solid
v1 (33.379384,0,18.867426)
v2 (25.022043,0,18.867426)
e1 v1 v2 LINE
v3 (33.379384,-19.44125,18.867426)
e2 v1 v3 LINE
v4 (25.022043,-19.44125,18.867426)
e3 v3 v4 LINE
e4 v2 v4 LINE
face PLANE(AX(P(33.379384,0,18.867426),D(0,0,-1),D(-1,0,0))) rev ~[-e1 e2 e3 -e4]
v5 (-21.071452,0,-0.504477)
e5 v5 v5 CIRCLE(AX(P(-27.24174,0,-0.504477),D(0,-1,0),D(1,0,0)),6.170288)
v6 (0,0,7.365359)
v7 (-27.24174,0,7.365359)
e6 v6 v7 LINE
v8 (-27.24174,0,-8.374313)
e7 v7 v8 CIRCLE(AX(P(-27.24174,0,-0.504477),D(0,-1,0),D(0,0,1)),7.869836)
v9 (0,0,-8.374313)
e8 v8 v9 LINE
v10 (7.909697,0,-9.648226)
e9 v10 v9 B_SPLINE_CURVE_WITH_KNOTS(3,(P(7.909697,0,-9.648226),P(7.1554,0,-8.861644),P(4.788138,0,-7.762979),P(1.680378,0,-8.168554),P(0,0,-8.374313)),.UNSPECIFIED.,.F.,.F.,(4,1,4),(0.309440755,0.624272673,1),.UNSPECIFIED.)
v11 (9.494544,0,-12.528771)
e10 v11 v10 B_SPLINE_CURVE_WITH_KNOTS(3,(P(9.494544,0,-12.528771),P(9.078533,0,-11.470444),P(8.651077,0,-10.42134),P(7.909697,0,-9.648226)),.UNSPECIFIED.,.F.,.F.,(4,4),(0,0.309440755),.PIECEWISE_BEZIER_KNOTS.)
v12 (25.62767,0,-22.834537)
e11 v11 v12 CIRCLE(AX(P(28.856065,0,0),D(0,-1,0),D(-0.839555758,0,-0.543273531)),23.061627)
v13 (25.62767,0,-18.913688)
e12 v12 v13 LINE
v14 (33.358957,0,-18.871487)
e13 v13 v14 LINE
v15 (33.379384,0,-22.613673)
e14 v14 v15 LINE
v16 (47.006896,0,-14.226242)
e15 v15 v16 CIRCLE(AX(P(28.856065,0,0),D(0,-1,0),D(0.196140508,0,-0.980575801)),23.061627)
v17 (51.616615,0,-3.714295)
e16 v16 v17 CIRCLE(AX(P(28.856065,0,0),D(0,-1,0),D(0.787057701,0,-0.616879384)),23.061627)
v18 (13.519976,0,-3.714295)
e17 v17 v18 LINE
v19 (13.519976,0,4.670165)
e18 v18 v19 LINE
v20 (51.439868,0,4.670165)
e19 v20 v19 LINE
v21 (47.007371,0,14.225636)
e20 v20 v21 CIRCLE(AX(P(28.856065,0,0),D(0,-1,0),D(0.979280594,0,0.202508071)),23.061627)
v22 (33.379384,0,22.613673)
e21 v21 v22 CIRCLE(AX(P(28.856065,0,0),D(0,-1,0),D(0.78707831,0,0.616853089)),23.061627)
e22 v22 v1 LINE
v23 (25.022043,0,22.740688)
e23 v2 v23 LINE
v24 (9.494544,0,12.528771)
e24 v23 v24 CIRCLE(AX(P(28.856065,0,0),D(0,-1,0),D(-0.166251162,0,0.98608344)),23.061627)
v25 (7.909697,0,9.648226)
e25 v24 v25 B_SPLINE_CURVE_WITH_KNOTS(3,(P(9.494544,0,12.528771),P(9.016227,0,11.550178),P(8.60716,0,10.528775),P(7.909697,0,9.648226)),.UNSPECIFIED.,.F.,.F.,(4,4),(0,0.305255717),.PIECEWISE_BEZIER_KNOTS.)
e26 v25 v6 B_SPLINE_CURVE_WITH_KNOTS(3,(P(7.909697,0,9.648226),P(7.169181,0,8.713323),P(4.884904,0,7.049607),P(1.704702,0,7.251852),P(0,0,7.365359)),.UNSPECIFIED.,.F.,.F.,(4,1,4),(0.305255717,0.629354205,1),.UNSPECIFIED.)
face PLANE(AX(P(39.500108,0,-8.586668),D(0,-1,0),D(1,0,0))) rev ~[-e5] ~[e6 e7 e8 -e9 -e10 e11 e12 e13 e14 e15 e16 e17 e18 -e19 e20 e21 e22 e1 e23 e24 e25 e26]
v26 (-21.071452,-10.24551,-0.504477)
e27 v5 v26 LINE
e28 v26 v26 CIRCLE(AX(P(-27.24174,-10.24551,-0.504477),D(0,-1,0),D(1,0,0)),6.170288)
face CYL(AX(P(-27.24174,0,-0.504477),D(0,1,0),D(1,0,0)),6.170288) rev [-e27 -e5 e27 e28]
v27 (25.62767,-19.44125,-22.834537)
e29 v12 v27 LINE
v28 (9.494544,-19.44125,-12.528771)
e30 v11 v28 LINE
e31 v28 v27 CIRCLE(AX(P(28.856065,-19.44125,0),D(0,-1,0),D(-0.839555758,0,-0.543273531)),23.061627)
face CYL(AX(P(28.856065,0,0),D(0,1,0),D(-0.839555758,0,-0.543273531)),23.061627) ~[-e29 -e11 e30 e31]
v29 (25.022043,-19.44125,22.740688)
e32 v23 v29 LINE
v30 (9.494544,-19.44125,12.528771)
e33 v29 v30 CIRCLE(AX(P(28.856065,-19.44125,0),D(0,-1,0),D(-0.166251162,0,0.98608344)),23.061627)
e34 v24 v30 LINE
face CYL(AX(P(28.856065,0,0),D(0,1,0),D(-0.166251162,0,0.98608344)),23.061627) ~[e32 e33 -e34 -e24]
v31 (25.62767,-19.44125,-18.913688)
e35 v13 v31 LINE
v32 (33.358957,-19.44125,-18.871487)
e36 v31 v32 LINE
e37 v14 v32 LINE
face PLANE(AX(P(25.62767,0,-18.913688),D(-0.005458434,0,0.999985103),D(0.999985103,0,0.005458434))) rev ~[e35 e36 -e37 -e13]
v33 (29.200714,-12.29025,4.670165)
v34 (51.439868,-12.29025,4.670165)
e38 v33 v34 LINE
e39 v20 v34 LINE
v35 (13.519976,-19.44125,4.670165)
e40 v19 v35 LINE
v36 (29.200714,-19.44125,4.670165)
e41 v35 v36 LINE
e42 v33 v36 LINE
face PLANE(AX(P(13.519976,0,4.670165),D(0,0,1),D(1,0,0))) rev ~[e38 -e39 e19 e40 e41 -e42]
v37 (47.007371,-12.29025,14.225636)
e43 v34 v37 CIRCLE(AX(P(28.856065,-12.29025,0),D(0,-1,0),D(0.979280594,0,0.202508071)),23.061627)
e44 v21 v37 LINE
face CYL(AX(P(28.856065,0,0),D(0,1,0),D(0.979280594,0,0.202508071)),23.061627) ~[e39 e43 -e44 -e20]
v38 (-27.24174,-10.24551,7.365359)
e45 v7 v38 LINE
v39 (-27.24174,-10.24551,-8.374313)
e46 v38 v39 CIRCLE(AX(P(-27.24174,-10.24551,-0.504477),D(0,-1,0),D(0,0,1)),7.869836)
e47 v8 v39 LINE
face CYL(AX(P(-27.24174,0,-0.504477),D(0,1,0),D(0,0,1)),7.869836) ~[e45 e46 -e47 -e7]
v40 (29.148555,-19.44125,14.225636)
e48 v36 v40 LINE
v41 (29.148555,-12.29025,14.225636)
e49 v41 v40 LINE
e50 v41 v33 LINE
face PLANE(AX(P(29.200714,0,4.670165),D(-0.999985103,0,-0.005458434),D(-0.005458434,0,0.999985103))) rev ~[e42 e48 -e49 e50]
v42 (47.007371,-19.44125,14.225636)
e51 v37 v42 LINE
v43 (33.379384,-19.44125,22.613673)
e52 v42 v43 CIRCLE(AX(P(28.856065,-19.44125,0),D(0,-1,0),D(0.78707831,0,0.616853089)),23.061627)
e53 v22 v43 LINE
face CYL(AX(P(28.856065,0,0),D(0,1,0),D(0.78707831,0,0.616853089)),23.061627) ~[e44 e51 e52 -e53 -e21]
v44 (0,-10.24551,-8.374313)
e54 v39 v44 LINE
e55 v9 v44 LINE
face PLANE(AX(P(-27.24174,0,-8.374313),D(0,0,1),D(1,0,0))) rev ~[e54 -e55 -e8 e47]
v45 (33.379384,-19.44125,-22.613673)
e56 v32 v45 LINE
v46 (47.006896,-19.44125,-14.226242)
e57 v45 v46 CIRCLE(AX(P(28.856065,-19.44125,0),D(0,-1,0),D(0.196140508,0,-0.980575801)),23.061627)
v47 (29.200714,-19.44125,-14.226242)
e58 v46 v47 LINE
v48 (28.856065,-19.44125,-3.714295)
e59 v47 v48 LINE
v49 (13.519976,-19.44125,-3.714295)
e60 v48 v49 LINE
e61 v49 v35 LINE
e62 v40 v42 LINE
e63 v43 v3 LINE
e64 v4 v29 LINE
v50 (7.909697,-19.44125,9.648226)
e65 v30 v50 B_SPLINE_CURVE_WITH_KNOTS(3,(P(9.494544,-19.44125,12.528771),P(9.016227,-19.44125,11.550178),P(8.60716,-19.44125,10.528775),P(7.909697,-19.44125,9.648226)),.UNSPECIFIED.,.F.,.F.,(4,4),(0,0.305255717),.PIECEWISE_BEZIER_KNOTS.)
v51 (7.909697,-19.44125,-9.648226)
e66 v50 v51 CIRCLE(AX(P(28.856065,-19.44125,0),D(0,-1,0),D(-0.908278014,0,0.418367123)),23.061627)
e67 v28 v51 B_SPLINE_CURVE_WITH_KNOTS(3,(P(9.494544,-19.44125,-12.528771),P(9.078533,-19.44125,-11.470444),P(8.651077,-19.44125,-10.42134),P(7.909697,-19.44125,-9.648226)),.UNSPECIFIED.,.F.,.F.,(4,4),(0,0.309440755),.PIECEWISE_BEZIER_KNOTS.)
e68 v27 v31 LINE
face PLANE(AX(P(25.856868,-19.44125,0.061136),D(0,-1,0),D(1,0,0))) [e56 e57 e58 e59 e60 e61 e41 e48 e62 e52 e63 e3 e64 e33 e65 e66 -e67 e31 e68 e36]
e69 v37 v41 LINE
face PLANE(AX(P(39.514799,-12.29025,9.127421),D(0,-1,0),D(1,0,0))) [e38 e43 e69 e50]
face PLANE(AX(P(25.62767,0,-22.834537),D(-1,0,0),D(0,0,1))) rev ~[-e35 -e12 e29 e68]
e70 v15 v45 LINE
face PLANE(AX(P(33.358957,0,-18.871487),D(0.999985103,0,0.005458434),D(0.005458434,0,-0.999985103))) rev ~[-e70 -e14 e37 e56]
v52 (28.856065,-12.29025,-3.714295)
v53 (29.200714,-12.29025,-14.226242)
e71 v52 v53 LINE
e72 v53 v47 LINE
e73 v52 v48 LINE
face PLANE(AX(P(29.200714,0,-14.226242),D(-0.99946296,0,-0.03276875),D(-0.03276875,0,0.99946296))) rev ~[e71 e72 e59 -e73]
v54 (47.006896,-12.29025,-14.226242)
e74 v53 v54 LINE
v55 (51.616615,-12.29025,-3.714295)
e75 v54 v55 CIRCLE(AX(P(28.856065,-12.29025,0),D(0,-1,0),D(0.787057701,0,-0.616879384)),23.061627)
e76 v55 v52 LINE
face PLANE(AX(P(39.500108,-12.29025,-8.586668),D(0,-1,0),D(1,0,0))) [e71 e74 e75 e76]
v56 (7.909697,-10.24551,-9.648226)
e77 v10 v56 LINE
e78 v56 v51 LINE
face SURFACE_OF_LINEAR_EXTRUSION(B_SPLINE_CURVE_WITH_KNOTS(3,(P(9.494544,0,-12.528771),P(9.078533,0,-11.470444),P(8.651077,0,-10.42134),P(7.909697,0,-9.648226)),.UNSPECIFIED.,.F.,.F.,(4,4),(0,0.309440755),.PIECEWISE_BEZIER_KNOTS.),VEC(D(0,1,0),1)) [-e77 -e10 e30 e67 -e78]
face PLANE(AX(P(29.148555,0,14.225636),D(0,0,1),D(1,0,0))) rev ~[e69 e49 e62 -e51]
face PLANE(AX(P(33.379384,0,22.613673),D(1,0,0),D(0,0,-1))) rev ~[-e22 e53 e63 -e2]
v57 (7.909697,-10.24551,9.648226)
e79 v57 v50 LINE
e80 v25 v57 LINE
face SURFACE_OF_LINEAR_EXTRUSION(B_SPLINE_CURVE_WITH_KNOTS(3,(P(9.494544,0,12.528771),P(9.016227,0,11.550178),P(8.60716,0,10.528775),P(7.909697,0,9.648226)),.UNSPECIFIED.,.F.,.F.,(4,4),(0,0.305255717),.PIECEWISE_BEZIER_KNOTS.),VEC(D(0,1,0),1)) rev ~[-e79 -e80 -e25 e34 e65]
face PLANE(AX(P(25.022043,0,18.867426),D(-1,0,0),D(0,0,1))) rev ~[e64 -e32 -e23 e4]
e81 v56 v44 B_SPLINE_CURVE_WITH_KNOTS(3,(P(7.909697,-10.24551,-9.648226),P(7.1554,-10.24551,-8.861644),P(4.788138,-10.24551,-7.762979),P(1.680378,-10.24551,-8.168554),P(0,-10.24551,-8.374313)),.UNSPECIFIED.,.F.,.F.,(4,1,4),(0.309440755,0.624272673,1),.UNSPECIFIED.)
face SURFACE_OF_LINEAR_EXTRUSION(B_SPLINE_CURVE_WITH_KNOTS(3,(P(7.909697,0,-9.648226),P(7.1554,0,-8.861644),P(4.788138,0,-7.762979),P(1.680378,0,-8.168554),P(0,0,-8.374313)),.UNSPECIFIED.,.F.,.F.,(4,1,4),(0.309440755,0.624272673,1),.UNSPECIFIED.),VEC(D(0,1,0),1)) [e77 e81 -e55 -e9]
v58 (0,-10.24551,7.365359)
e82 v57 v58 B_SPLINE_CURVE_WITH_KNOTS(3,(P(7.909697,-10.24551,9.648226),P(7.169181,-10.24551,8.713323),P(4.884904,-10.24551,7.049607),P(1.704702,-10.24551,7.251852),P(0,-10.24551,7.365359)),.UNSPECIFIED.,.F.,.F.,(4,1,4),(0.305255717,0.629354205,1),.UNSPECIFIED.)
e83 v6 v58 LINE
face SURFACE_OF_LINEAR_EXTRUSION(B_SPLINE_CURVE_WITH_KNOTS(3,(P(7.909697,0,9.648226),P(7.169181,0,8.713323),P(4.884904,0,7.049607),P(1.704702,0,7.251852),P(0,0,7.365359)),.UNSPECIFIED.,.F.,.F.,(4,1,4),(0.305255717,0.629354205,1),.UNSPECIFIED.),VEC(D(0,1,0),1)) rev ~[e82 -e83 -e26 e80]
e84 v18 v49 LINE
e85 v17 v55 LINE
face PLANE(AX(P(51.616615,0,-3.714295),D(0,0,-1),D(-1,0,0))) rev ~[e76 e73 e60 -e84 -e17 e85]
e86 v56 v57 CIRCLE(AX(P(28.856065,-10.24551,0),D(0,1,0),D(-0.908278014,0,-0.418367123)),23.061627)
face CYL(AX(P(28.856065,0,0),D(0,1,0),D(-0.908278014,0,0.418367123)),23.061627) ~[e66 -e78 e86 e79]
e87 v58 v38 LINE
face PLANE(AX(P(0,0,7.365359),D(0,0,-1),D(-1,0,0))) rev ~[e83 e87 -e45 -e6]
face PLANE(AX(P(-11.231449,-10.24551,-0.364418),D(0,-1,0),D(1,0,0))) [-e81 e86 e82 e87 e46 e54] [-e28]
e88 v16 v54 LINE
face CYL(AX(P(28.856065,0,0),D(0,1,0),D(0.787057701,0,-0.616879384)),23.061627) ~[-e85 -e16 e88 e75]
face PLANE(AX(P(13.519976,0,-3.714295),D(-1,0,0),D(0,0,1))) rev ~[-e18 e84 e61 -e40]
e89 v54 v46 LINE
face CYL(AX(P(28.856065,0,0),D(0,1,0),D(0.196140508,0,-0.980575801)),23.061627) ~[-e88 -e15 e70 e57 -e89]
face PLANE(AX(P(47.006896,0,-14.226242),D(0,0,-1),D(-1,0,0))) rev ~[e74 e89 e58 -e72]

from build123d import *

# Parameters (mm, degrees)
F0_R     = 6.1702881354
F1_DEPTH = 10.24551
F2_DEPTH = 19.44125
F3_DEPTH = 12.29025


# Not quite as in the source:
# - the program builds the solid bodies; features that only make, move or delete a surface that nothing else refers to are left out


with BuildPart() as f1:
    # F0 (on Front) → F1 (new body)
    with BuildSketch(Plane.XZ):
        with BuildLine():
            ThreePointArc((7.9096967883, -9.6482263274), (5.7944386046, 0), (7.9096967883, 9.6482263274))
            add(Edge.make_bspline(
                [(7.9096967883, 9.6482263274), (7.1691805882, 8.7133229845), (4.8849042306, 7.0496072248), (1.7047020698, 7.2518519174), (0, 7.3653594591)],
                knots=[0.305255717, 0.305255717, 0.305255717, 0.305255717, 0.6293542053, 1, 1, 1, 1], degree=3))
            Line((0, 7.3653594591), (-27.2417403758, 7.3653594591))
            ThreePointArc((-27.2417403758, 7.3653594591), (-35.1115765516, -0.5044767167), (-27.2417403758, -8.3743128926))
            Line((-27.2417403758, -8.3743128926), (0, -8.3743128926))
            add(Edge.make_bspline(
                [(7.9096967883, -9.6482263274), (7.1553998901, -8.8616436412), (4.7881379326, -7.7629787373), (1.6803783566, -8.1685536627), (0, -8.3743128926)],
                knots=[0.3094407552, 0.3094407552, 0.3094407552, 0.3094407552, 0.6242726729, 1, 1, 1, 1], degree=3))
        make_face()
        with Locations((-27.2417403758, -0.5044767167)):
            Circle(F0_R, mode=Mode.SUBTRACT)
    extrude(amount=F1_DEPTH)

    # F0 (on Front) → F2 (join)
    with BuildSketch(Plane.XZ):
        with BuildLine():
            Line((29.1485549066, 14.2256355643), (47.0073711523, 14.2256355643))
            ThreePointArc((47.0073711523, 14.2256355643), (40.9442597431, 19.6396071394), (33.3793842605, 22.6136728933))
            Line((33.3793842605, 22.6136728933), (33.3793842605, 18.8674259181))
            Line((33.3793842605, 18.8674259181), (25.0220429152, 18.8674259181))
            Line((25.0220429152, 18.8674259181), (25.0220429152, 22.7406880158))
            ThreePointArc((25.0220429152, 22.7406880158), (16.1840833933, 19.2680953065), (9.494543791, 12.5287712643))
            add(Edge.make_bspline(
                [(9.494543791, 12.5287712643), (9.0162268309, 11.5501776901), (8.6071600956, 10.5287752978), (7.9096967883, 9.6482263274)],
                knots=[0, 0, 0, 0, 0.305255717, 0.305255717, 0.305255717, 0.305255717], degree=3))
            ThreePointArc((7.9096967883, 9.6482263274), (5.7944386046, 0), (7.9096967883, -9.6482263274))
            add(Edge.make_bspline(
                [(9.494543791, -12.5287712643), (9.0785331078, -11.4704442228), (8.6510771527, -10.4213396199), (7.9096967883, -9.6482263274)],
                knots=[0, 0, 0, 0, 0.3094407552, 0.3094407552, 0.3094407552, 0.3094407552], degree=3))
            ThreePointArc((9.494543791, -12.5287712643), (16.441223865, -19.434771268), (25.6276700044, -22.8345370586))
            Line((25.6276700044, -22.8345370586), (25.6276700044, -18.9136881421))
            Line((25.6276700044, -18.9136881421), (33.3589574797, -18.8714867898))
            Line((33.3589574797, -18.8714867898), (33.3793842605, -22.6136728933))
            ThreePointArc((33.3793842605, -22.6136728933), (40.9439316742, -19.6398090623), (47.0068958817, -14.2262419686))
            Line((47.0068958817, -14.2262419686), (29.2007135878, -14.2262419686))
            Line((29.2007135878, -14.2262419686), (28.8560651243, -3.7142947274))
            Line((28.8560651243, -3.7142947274), (13.5199762881, -3.7142947274))
            Line((13.5199762881, -3.7142947274), (13.5199762881, 4.6701654948))
            Line((13.5199762881, 4.6701654948), (29.2007135878, 4.6701654948))
            Line((29.2007135878, 4.6701654948), (29.1485549066, 14.2256355643))
        make_face()
    extrude(amount=F2_DEPTH)

    # F0 (on Front) → F3 (join)
    with BuildSketch(Plane.XZ):
        with BuildLine():
            ThreePointArc((47.0068958817, -14.2262419686), (49.9762101479, -9.2616462852), (51.6166150388, -3.7142947274))
            Line((51.6166150388, -3.7142947274), (28.8560651243, -3.7142947274))
            Line((28.8560651243, -3.7142947274), (29.2007135878, -14.2262419686))
            Line((29.2007135878, -14.2262419686), (47.0068958817, -14.2262419686))
        make_face()
        with BuildLine():
            Line((29.2007135878, 4.6701654948), (51.4398684351, 4.6701654948))
            ThreePointArc((51.4398684351, 4.6701654948), (49.7764866132, 9.704358941), (47.0073711523, 14.2256355643))
            Line((47.0073711523, 14.2256355643), (29.1485549066, 14.2256355643))
            Line((29.1485549066, 14.2256355643), (29.2007135878, 4.6701654948))
        make_face()
    extrude(amount=F3_DEPTH)


solid = f1.part
